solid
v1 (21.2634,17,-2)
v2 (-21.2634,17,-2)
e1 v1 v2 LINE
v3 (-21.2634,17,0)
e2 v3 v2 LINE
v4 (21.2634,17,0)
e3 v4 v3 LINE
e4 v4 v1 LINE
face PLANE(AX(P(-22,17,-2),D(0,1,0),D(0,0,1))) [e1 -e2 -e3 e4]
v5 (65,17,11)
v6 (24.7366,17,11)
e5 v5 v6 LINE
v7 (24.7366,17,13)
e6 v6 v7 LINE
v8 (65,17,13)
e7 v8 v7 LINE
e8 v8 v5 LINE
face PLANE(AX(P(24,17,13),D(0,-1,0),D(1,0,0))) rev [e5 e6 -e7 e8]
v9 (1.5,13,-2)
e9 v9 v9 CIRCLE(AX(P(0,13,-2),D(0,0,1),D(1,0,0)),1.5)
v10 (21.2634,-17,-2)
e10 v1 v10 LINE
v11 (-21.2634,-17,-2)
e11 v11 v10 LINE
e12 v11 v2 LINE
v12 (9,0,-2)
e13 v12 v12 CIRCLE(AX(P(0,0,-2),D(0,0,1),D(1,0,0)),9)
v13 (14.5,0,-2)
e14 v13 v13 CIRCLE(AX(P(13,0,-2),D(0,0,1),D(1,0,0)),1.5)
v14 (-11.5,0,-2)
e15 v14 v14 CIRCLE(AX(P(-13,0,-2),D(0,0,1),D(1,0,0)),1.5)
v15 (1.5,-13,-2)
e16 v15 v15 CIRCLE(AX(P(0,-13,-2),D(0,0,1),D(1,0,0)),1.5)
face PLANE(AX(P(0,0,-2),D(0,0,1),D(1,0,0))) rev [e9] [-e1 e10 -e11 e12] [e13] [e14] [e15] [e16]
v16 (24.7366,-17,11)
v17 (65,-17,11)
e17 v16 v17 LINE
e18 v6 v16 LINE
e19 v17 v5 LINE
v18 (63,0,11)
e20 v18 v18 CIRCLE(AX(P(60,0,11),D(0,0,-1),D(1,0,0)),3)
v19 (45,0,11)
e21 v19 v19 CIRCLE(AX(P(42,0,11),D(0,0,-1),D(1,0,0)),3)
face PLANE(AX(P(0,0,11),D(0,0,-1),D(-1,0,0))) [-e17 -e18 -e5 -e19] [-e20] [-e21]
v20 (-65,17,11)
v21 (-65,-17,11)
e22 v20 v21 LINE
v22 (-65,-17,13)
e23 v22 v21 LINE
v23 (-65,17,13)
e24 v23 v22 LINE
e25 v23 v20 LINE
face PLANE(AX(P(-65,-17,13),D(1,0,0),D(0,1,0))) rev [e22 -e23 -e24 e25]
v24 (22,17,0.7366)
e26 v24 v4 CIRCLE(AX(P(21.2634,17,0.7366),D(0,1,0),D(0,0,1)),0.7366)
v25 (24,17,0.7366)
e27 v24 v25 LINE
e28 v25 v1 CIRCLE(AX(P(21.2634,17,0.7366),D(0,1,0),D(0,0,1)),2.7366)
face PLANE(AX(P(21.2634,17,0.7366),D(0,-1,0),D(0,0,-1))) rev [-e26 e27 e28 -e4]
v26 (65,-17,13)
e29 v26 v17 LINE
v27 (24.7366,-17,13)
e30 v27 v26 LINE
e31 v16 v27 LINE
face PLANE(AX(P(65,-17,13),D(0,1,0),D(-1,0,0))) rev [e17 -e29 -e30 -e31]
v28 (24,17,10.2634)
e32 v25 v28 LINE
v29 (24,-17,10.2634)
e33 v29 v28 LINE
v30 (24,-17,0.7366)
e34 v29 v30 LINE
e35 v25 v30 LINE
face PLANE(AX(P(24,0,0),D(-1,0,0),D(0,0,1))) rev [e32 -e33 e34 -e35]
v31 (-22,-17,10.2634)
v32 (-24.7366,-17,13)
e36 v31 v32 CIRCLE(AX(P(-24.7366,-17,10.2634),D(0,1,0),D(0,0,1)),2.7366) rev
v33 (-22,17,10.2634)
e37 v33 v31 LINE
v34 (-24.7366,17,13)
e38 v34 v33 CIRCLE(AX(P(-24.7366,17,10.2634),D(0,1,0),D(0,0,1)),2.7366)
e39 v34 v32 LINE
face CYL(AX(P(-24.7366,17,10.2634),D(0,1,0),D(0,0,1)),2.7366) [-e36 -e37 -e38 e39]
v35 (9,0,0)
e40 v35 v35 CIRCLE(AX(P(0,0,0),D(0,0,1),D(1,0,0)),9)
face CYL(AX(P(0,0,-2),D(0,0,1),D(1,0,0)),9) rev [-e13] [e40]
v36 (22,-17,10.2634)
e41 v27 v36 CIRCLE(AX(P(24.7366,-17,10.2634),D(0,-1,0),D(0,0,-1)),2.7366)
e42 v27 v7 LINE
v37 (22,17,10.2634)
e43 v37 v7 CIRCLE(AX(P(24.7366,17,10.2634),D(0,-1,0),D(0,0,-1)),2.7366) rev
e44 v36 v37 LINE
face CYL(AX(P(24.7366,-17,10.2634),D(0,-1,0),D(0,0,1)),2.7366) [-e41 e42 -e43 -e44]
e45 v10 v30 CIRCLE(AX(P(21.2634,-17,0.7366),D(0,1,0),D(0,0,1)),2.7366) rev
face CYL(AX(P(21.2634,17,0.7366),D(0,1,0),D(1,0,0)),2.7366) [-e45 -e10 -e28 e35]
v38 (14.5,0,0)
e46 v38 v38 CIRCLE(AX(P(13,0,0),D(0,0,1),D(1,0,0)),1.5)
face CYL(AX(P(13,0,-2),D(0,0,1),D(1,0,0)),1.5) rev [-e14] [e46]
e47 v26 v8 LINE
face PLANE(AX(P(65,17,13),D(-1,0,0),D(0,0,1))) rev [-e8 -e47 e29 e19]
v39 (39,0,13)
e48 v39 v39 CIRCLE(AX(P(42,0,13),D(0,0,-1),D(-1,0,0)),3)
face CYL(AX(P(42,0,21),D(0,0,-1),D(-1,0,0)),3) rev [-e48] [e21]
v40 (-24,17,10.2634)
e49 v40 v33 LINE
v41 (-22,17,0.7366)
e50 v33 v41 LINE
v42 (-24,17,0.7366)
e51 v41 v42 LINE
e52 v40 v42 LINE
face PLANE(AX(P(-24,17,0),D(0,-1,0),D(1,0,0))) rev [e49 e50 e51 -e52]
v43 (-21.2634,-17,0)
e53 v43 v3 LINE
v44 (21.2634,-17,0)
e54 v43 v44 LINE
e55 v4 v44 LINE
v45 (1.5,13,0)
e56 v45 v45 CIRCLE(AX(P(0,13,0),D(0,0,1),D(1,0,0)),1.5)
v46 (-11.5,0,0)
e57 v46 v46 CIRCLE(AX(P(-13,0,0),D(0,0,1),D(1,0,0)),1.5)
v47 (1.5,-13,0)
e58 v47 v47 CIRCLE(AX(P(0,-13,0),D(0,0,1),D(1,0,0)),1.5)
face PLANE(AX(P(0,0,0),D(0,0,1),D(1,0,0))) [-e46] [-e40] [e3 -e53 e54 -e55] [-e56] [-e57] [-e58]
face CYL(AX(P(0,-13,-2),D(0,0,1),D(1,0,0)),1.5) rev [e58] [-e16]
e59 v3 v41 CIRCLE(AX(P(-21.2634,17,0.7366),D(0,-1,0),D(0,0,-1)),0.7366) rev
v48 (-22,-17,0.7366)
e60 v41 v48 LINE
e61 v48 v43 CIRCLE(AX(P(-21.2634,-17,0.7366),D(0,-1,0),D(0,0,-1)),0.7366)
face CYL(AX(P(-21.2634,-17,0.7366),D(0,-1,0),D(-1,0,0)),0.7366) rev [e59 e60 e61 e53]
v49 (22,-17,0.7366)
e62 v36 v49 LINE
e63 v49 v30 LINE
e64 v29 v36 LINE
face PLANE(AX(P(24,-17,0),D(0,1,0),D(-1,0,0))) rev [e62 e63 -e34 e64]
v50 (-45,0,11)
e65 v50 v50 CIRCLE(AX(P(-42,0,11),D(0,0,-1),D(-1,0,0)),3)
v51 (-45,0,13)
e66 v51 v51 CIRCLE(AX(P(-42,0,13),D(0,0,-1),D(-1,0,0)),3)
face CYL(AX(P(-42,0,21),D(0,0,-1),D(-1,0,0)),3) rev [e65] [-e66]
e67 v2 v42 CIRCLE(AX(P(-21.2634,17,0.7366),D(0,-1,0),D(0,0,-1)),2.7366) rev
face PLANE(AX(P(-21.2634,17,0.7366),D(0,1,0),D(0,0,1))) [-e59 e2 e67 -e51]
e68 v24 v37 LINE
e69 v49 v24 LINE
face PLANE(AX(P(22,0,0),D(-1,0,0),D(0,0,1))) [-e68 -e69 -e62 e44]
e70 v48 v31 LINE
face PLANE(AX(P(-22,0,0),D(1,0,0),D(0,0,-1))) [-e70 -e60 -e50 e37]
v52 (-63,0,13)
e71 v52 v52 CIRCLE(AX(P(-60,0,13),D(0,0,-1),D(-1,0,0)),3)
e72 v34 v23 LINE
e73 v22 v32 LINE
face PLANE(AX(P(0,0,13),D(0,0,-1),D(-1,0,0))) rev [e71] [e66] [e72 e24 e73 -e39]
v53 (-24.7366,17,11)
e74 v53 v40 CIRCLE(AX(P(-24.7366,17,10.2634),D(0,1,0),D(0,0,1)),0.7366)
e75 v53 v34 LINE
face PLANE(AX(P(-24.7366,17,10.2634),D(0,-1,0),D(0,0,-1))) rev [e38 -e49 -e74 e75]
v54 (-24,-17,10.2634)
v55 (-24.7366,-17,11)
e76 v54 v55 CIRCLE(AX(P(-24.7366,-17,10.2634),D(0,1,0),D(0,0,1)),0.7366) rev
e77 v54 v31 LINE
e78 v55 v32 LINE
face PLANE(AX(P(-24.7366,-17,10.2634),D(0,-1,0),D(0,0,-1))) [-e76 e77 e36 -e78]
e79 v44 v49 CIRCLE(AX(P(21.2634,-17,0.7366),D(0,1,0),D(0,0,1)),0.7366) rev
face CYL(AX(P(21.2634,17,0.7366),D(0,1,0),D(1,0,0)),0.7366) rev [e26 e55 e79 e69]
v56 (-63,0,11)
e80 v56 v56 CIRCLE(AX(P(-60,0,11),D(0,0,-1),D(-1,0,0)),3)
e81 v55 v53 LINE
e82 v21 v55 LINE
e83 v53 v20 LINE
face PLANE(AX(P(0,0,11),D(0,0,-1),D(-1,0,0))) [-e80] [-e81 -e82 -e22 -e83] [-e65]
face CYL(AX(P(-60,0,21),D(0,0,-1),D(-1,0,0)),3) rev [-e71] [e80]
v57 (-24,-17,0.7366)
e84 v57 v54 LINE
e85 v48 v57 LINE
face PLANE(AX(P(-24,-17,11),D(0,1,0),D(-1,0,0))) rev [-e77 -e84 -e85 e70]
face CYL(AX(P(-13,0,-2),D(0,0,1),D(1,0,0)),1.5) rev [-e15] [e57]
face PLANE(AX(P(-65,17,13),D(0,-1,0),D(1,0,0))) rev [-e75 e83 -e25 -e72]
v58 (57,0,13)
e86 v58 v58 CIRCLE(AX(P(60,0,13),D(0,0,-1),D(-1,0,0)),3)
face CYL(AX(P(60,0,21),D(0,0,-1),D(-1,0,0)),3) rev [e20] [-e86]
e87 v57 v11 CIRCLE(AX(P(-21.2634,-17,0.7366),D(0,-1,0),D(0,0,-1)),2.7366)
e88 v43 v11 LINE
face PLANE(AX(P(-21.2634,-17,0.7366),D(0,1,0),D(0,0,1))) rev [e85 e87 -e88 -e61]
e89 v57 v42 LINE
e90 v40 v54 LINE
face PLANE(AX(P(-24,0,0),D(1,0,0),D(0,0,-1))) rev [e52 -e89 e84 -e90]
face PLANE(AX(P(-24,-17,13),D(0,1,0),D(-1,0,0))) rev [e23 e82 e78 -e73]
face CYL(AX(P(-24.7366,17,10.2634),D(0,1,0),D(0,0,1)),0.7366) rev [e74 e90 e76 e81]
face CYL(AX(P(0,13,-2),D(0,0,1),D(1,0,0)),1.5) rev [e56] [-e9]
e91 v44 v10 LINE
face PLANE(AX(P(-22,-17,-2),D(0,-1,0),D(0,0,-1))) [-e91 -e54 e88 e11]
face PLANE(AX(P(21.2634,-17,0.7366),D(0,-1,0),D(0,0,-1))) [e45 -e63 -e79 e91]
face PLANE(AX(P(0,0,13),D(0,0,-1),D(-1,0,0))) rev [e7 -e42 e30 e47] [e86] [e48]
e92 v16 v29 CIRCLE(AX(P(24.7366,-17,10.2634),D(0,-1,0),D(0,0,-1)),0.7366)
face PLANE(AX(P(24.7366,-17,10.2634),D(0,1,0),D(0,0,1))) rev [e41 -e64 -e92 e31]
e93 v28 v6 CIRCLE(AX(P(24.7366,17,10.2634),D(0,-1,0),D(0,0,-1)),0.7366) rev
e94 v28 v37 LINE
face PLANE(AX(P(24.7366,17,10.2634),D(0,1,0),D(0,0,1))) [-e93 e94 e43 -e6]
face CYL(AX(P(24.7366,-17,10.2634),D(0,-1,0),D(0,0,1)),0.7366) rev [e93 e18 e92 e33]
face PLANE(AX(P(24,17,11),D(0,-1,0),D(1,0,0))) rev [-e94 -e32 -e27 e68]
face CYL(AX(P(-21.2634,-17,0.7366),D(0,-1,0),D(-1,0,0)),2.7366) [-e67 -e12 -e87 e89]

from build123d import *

# Parameters (mm, degrees)
SKETCH1_W                      = 44
SKETCH1_H                      = 34
SKETCH1_R                      = 9
SKETCH1_R_2                    = 1.5
BASE_FLANGE1_DEPTH             = 2
EDGE_FLANGE1_STRIP_W           = 9.4732
EDGE_FLANGE1_STRIP_H           = 2
EDGE_FLANGE1_STRIP_CUT_DEPTH   = 34
EDGE_FLANGE1_STRIP_2_W         = 9.4732
EDGE_FLANGE1_STRIP_2_H         = 2
EDGE_FLANGE1_STRIP_CUT_2_DEPTH = 34
EDGE_FLANGE1_DEPTH             = 34
EDGE_FLANGE1_BEND_DEPTH        = 34
EDGE_FLANGE2_STRIP_W           = 9.4732
EDGE_FLANGE2_STRIP_H           = 2
EDGE_FLANGE2_STRIP_CUT_DEPTH   = 34
EDGE_FLANGE2_STRIP_2_W         = 9.4732
EDGE_FLANGE2_STRIP_2_H         = 2
EDGE_FLANGE2_STRIP_CUT_2_DEPTH = 34
EDGE_FLANGE2_DEPTH             = 34
EDGE_FLANGE2_BEND_DEPTH        = 34
SKETCH18_R                     = 3
CUT_EXTRUDE1_DEPTH             = 10


# Sheet-metal steps are written as plain solids
with BuildPart() as part:
    # Sketch1 → Base-Flange1 (new body)
    with BuildSketch(Plane.XY):
        Rectangle(SKETCH1_W, SKETCH1_H)
        Circle(SKETCH1_R, mode=Mode.SUBTRACT)
        with Locations((0, 13)):
            Circle(SKETCH1_R_2, mode=Mode.SUBTRACT)
        with Locations((13, 0)):
            Circle(SKETCH1_R_2, mode=Mode.SUBTRACT)
        with Locations((0, -13)):
            Circle(SKETCH1_R_2, mode=Mode.SUBTRACT)
        with Locations((-13, 0)):
            Circle(SKETCH1_R_2, mode=Mode.SUBTRACT)
    extrude(amount=-BASE_FLANGE1_DEPTH)

    # Edge-Flange1 strip (across the edge) → Edge-Flange1 strip cut (cut)
    with BuildSketch(Plane(origin=(-22, 17, 0), x_dir=(1, 0, 0), z_dir=(0, -1, 0))):
        with Locations((-4, -1)):
            Rectangle(EDGE_FLANGE1_STRIP_W, EDGE_FLANGE1_STRIP_H)
    extrude(amount=EDGE_FLANGE1_STRIP_CUT_DEPTH, mode=Mode.SUBTRACT)

    # Edge-Flange1 strip 2 (across the edge) → Edge-Flange1 strip cut 2 (cut)
    with BuildSketch(Plane(origin=(22, -17, 0), x_dir=(-1, 0, 0), z_dir=(0, 1, 0))):
        with Locations((-4, -1)):
            Rectangle(EDGE_FLANGE1_STRIP_2_W, EDGE_FLANGE1_STRIP_2_H)
    extrude(amount=EDGE_FLANGE1_STRIP_CUT_2_DEPTH, mode=Mode.SUBTRACT)

    # Edge-Flange1 section (across the edge) → Edge-Flange1 (add)
    with BuildSketch(Plane(origin=(-22, 17, 0), x_dir=(1, 0, 0), z_dir=(0, -1, 0))):
        with BuildLine():
            Line((-2, 0.7366), (-2, 11))
            Line((-2, 11), (0, 11))
            Line((0, 11), (0, 0.7366))
            ThreePointArc((0, 0.7366), (0.215745145, 0.215745145), (0.7366, 0))
            Line((0.7366, 0), (0.7366, -2))
            ThreePointArc((0.7366, -2), (-1.198468417, -1.198468417), (-2, 0.7366))
        make_face()
    extrude(amount=EDGE_FLANGE1_DEPTH)

    # Edge-Flange1 section 2 (across the edge) → Edge-Flange1 bend (add)
    with BuildSketch(Plane(origin=(22, -17, 0), x_dir=(-1, 0, 0), z_dir=(0, 1, 0))):
        with BuildLine():
            Line((-2, 0.7366), (-2, 11))
            Line((-2, 11), (0, 11))
            Line((0, 11), (0, 0.7366))
            ThreePointArc((0, 0.7366), (0.215745145, 0.215745145), (0.7366, 0))
            Line((0.7366, 0), (0.7366, -2))
            ThreePointArc((0.7366, -2), (-1.198468417, -1.198468417), (-2, 0.7366))
        make_face()
    extrude(amount=EDGE_FLANGE1_BEND_DEPTH)

    # Edge-Flange2 strip (across the edge) → Edge-Flange2 strip cut (cut)
    with BuildSketch(Plane(origin=(-24, -17, 11), x_dir=(0, 0, -1), z_dir=(0, 1, 0))):
        with Locations((-4, -1)):
            Rectangle(EDGE_FLANGE2_STRIP_W, EDGE_FLANGE2_STRIP_H)
    extrude(amount=EDGE_FLANGE2_STRIP_CUT_DEPTH, mode=Mode.SUBTRACT)

    # Edge-Flange2 strip 2 (across the edge) → Edge-Flange2 strip cut 2 (cut)
    with BuildSketch(Plane(origin=(24, 17, 11), x_dir=(0, 0, -1), z_dir=(0, -1, 0))):
        with Locations((-4, -1)):
            Rectangle(EDGE_FLANGE2_STRIP_2_W, EDGE_FLANGE2_STRIP_2_H)
    extrude(amount=EDGE_FLANGE2_STRIP_CUT_2_DEPTH, mode=Mode.SUBTRACT)

    # Edge-Flange2 section (across the edge) → Edge-Flange2 (add)
    with BuildSketch(Plane(origin=(-24, -17, 11), x_dir=(0, 0, -1), z_dir=(0, 1, 0))):
        with BuildLine():
            Line((-2, 0.7366), (-2, 41))
            Line((-2, 41), (0, 41))
            Line((0, 41), (0, 0.7366))
            ThreePointArc((0, 0.7366), (0.215745145, 0.215745145), (0.7366, 0))
            Line((0.7366, 0), (0.7366, -2))
            ThreePointArc((0.7366, -2), (-1.198468417, -1.198468417), (-2, 0.7366))
        make_face()
    extrude(amount=EDGE_FLANGE2_DEPTH)

    # Edge-Flange2 section 2 (across the edge) → Edge-Flange2 bend (add)
    with BuildSketch(Plane(origin=(24, 17, 11), x_dir=(0, 0, -1), z_dir=(0, -1, 0))):
        with BuildLine():
            Line((-2, 0.7366), (-2, 41))
            Line((-2, 41), (0, 41))
            Line((0, 41), (0, 0.7366))
            ThreePointArc((0, 0.7366), (0.215745145, 0.215745145), (0.7366, 0))
            Line((0.7366, 0), (0.7366, -2))
            ThreePointArc((0.7366, -2), (-1.198468417, -1.198468417), (-2, 0.7366))
        make_face()
    extrude(amount=EDGE_FLANGE2_BEND_DEPTH)

    # Sketch18 → Cut-Extrude1 (cut)
    with BuildSketch(Plane(origin=(0, 0, 11), x_dir=(-1, 0, 0), z_dir=(0, 0, -1))):
        with Locations((60, 0)):
            Circle(SKETCH18_R)
        with Locations((42, 0)):
            Circle(SKETCH18_R)
        with Locations((-60, 0)):
            Circle(SKETCH18_R)
        with Locations((-42, 0)):
            Circle(SKETCH18_R)
    extrude(amount=-CUT_EXTRUDE1_DEPTH, mode=Mode.SUBTRACT)


solid = part.part
